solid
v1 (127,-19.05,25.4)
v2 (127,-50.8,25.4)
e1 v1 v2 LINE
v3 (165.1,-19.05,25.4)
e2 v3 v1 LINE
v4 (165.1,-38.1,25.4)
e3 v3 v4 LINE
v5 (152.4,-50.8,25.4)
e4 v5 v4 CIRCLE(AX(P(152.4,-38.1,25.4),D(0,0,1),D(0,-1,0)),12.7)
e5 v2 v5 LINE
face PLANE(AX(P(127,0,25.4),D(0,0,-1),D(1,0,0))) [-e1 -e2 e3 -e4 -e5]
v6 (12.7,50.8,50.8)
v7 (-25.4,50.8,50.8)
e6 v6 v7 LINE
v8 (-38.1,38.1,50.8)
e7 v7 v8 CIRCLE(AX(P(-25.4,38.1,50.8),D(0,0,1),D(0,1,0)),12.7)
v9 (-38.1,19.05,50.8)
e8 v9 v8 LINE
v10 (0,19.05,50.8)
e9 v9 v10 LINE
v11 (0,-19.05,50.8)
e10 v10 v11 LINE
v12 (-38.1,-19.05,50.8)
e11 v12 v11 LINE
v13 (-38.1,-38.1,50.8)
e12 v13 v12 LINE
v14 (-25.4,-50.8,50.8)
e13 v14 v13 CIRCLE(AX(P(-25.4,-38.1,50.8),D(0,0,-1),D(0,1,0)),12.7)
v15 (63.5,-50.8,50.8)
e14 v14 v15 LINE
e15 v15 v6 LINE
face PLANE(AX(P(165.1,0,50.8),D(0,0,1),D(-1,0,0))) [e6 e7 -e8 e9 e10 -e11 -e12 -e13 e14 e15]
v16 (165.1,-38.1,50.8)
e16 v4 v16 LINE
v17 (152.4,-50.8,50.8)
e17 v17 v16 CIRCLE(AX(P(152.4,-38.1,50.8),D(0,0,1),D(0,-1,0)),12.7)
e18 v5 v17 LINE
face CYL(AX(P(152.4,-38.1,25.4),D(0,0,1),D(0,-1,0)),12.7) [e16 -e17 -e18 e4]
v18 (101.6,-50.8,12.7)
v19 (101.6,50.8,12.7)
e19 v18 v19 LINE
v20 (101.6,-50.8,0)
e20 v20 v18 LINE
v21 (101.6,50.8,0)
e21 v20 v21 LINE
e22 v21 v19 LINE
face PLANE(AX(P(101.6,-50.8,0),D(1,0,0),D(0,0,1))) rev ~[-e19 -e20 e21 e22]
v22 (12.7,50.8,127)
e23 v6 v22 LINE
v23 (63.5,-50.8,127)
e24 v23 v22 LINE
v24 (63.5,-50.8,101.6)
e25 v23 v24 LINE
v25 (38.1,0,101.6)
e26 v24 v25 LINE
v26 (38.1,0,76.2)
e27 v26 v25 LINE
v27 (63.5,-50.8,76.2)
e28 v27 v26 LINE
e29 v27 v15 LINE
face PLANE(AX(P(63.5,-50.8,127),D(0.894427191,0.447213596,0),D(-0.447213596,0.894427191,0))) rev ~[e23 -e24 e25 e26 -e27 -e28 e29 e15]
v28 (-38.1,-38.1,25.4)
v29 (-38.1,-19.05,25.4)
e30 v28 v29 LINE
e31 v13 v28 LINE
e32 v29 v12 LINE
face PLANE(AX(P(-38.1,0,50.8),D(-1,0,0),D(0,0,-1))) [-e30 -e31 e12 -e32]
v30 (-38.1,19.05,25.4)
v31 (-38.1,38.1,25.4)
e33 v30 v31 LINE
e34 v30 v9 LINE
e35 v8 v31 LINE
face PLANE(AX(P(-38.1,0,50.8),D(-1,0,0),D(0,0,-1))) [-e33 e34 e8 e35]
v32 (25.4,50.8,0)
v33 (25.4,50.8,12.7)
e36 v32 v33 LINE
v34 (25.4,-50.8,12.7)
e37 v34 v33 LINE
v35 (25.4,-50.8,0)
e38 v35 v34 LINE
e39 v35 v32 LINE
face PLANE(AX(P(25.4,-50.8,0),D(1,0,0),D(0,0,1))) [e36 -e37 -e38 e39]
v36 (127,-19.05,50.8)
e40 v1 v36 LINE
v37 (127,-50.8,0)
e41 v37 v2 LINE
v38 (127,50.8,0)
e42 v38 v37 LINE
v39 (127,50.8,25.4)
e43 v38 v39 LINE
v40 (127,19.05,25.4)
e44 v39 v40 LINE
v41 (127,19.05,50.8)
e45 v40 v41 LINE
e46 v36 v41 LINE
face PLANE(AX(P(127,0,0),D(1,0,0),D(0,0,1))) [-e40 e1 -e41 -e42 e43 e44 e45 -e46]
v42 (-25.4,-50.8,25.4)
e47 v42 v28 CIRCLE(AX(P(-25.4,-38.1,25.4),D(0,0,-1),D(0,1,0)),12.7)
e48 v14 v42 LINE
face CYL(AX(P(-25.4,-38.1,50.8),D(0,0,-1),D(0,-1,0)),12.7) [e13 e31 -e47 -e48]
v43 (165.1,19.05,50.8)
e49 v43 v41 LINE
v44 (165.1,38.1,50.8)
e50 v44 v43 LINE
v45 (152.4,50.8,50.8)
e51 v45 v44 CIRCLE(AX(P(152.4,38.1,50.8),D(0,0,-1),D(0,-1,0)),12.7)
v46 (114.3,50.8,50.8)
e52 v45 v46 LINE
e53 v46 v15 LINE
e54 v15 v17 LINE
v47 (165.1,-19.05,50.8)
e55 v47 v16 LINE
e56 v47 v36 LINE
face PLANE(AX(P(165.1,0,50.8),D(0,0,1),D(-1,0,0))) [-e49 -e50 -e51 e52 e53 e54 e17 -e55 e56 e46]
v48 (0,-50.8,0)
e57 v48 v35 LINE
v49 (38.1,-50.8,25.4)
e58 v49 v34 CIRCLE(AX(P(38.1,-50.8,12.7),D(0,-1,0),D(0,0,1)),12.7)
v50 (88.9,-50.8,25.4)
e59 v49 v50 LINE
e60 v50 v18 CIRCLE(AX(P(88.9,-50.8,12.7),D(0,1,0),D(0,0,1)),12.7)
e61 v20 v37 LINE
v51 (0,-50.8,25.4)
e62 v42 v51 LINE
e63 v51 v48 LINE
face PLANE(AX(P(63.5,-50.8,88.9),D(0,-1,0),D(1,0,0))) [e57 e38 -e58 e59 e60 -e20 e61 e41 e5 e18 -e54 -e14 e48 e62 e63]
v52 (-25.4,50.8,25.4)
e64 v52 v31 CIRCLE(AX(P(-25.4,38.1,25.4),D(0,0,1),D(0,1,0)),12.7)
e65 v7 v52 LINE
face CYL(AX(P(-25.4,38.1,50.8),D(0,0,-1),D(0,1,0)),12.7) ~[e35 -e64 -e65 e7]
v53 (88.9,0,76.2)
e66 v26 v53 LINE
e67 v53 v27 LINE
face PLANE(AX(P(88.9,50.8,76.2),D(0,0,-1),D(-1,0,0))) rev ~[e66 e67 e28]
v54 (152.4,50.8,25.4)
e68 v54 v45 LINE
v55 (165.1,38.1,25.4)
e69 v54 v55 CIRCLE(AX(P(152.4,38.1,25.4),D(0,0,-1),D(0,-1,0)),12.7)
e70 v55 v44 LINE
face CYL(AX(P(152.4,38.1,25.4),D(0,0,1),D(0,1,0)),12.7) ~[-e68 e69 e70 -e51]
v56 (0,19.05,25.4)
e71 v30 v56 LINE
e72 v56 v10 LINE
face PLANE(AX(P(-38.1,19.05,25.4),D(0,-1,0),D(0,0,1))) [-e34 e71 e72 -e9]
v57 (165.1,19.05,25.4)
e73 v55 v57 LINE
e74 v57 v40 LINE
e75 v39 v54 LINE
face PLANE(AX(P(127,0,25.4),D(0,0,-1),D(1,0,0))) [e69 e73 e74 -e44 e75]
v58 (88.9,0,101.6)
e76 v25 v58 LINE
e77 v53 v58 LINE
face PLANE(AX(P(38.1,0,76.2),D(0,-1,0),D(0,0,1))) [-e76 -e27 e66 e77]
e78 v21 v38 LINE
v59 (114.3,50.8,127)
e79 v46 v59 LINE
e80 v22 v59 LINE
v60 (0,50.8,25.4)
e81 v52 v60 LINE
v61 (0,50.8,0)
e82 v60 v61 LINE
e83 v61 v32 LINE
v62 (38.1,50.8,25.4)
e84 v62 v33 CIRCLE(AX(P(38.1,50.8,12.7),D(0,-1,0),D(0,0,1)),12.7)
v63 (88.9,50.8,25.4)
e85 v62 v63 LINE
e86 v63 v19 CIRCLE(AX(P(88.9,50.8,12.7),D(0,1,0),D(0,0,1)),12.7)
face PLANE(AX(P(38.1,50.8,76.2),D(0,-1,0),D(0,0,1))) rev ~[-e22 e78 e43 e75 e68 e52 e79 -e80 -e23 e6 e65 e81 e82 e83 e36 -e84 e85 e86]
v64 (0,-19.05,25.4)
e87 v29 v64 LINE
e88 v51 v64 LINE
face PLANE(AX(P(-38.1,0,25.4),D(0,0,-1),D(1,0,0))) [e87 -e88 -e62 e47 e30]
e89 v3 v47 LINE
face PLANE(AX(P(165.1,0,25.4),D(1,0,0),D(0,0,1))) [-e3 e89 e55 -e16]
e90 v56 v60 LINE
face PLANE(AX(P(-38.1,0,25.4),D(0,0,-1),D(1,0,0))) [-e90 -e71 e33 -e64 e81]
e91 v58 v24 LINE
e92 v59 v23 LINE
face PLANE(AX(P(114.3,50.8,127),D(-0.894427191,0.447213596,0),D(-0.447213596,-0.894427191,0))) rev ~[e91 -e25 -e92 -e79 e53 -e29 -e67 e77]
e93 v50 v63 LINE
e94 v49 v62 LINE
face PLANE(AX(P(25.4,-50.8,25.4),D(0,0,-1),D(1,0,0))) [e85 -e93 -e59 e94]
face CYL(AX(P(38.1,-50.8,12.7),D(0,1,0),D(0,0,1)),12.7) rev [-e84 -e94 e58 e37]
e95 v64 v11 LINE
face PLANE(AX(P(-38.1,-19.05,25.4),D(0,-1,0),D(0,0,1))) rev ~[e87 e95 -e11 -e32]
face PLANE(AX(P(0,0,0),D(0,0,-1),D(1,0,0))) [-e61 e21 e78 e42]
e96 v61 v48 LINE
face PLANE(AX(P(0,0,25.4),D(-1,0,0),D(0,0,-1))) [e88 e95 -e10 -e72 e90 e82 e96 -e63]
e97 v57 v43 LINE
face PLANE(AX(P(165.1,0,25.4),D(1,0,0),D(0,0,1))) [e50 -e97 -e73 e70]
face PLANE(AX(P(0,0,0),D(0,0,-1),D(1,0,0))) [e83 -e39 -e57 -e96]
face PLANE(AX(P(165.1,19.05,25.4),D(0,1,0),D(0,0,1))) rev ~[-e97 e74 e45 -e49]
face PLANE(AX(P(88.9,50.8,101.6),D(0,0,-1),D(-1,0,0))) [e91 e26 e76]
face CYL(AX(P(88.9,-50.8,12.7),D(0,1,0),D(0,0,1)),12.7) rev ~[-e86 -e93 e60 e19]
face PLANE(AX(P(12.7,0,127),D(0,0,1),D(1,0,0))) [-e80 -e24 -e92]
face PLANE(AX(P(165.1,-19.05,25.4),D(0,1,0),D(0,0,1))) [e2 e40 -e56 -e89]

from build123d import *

# Parameters (mm, degrees)
F1_DEPTH       = 50.8
F2_W           = 76.2
F2_H           = 25.4
F3_DEPTH       = 101.601
F4_R           = 12.7
F5_R           = 12.7
F6_W           = 38.1
F6_H           = 25.4
F7_DEPTH       = 38.1
F8_W           = 38.1
F8_H           = 25.4
F9_DEPTH       = 38.1
F10_R          = 12.7
F11_W          = 101.6
F11_H          = 76.2
F12_DEPTH      = 50.8
F12_DEPTH_BACK = 50.8
F14_DEPTH      = 76.2
F15_W          = 50.8
F15_H          = 25.4
F16_DEPTH      = 101.601
F16_DEPTH_BACK = 356
F17_DEPTH      = 50.8


# Not quite as in the source:
# - an extrude ends at something that could not be found from the text; its depth is read off the source's solid


with BuildPart() as f1:
    # F0 (on Front) → F1 (new body, symmetric)
    with BuildSketch(Plane.XZ):
        Polygon((0, 25.4), (0, 0), (127, 0), (127, 25.4), (165.1, 25.4), (165.1, 50.8), (-38.1, 50.8), (-38.1, 25.4), align=None)
    extrude(amount=F1_DEPTH, both=True)

    # F2 (on face) → F3 (cut, through all)
    with BuildSketch(Plane.XZ.offset(50.8)):
        with Locations((63.5, 12.7)):
            Rectangle(F2_W, F2_H)
    extrude(amount=-F3_DEPTH, mode=Mode.SUBTRACT)

    # F4
    f4_edges = [f1.edges().sort_by_distance(p)[0] for p in [
        (25.4, 0, 25.4),
    ]]
    fillet(f4_edges, radius=F4_R)

    # F5
    f5_edges = [f1.edges().sort_by_distance(p)[0] for p in [
        (101.6, 0, 25.4),
    ]]
    fillet(f5_edges, radius=F5_R)

    # F6 (on face) → F7 (cut)
    with BuildSketch(Plane.YZ.offset(165.1)):
        with Locations((0, 38.1)):
            Rectangle(F6_W, F6_H)
    extrude(amount=-F7_DEPTH, mode=Mode.SUBTRACT)

    # F8 (on face) → F9 (cut)
    with BuildSketch(Plane(origin=(-38.1, 0, 0), x_dir=(0, -1, 0), z_dir=(-1, 0, 0))):
        with Locations((0, 38.1)):
            Rectangle(F8_W, F8_H)
    extrude(amount=-F9_DEPTH, mode=Mode.SUBTRACT)

    # F10
    f10_edges = [f1.edges().sort_by_distance(p)[0] for p in [
        (-38.1, -50.8, 38.1),
        (-38.1, 50.8, 38.1),
        (165.1, 50.8, 38.1),
        (165.1, -50.8, 38.1),
    ]]
    fillet(f10_edges, radius=F10_R)

    # F11 (on Front) → F12 (join, two sides)
    with BuildSketch(Plane.XZ) as f12_sk:
        with Locations((63.5, 88.9)):
            Rectangle(F11_W, F11_H)
    extrude(amount=-F12_DEPTH)
    extrude(f12_sk.sketch, amount=F12_DEPTH_BACK)

    # F13 (on face) → F14 (cut)
    with BuildSketch(Plane.XY.offset(127)):
        Polygon((63.5, -50.8), (12.7, 50.8), (12.7, -50.8), align=None)
        Polygon((114.3, 50.8), (63.5, -50.8), (114.3, -50.8), align=None)
    extrude(amount=-F14_DEPTH, mode=Mode.SUBTRACT)

    # F15 (on face) → F16 (cut, two sides)
    with BuildSketch(Plane(origin=(0, 50.8, 0), x_dir=(-1, 0, 0), z_dir=(0, 1, 0))) as f16_sk:
        with Locations((-63.5, 88.9)):
            Rectangle(F15_W, F15_H)
    extrude(amount=-F16_DEPTH, mode=Mode.SUBTRACT)
    extrude(f16_sk.sketch, amount=F16_DEPTH_BACK, mode=Mode.SUBTRACT)

    # F17 (add): a face of the model
    f17_faces = [f1.faces().sort_by_distance(p)[0] for p in [
        (38.1, 25.4, 88.9),
    ]]
    extrude(f17_faces, amount=F17_DEPTH)


solid = f1.part
